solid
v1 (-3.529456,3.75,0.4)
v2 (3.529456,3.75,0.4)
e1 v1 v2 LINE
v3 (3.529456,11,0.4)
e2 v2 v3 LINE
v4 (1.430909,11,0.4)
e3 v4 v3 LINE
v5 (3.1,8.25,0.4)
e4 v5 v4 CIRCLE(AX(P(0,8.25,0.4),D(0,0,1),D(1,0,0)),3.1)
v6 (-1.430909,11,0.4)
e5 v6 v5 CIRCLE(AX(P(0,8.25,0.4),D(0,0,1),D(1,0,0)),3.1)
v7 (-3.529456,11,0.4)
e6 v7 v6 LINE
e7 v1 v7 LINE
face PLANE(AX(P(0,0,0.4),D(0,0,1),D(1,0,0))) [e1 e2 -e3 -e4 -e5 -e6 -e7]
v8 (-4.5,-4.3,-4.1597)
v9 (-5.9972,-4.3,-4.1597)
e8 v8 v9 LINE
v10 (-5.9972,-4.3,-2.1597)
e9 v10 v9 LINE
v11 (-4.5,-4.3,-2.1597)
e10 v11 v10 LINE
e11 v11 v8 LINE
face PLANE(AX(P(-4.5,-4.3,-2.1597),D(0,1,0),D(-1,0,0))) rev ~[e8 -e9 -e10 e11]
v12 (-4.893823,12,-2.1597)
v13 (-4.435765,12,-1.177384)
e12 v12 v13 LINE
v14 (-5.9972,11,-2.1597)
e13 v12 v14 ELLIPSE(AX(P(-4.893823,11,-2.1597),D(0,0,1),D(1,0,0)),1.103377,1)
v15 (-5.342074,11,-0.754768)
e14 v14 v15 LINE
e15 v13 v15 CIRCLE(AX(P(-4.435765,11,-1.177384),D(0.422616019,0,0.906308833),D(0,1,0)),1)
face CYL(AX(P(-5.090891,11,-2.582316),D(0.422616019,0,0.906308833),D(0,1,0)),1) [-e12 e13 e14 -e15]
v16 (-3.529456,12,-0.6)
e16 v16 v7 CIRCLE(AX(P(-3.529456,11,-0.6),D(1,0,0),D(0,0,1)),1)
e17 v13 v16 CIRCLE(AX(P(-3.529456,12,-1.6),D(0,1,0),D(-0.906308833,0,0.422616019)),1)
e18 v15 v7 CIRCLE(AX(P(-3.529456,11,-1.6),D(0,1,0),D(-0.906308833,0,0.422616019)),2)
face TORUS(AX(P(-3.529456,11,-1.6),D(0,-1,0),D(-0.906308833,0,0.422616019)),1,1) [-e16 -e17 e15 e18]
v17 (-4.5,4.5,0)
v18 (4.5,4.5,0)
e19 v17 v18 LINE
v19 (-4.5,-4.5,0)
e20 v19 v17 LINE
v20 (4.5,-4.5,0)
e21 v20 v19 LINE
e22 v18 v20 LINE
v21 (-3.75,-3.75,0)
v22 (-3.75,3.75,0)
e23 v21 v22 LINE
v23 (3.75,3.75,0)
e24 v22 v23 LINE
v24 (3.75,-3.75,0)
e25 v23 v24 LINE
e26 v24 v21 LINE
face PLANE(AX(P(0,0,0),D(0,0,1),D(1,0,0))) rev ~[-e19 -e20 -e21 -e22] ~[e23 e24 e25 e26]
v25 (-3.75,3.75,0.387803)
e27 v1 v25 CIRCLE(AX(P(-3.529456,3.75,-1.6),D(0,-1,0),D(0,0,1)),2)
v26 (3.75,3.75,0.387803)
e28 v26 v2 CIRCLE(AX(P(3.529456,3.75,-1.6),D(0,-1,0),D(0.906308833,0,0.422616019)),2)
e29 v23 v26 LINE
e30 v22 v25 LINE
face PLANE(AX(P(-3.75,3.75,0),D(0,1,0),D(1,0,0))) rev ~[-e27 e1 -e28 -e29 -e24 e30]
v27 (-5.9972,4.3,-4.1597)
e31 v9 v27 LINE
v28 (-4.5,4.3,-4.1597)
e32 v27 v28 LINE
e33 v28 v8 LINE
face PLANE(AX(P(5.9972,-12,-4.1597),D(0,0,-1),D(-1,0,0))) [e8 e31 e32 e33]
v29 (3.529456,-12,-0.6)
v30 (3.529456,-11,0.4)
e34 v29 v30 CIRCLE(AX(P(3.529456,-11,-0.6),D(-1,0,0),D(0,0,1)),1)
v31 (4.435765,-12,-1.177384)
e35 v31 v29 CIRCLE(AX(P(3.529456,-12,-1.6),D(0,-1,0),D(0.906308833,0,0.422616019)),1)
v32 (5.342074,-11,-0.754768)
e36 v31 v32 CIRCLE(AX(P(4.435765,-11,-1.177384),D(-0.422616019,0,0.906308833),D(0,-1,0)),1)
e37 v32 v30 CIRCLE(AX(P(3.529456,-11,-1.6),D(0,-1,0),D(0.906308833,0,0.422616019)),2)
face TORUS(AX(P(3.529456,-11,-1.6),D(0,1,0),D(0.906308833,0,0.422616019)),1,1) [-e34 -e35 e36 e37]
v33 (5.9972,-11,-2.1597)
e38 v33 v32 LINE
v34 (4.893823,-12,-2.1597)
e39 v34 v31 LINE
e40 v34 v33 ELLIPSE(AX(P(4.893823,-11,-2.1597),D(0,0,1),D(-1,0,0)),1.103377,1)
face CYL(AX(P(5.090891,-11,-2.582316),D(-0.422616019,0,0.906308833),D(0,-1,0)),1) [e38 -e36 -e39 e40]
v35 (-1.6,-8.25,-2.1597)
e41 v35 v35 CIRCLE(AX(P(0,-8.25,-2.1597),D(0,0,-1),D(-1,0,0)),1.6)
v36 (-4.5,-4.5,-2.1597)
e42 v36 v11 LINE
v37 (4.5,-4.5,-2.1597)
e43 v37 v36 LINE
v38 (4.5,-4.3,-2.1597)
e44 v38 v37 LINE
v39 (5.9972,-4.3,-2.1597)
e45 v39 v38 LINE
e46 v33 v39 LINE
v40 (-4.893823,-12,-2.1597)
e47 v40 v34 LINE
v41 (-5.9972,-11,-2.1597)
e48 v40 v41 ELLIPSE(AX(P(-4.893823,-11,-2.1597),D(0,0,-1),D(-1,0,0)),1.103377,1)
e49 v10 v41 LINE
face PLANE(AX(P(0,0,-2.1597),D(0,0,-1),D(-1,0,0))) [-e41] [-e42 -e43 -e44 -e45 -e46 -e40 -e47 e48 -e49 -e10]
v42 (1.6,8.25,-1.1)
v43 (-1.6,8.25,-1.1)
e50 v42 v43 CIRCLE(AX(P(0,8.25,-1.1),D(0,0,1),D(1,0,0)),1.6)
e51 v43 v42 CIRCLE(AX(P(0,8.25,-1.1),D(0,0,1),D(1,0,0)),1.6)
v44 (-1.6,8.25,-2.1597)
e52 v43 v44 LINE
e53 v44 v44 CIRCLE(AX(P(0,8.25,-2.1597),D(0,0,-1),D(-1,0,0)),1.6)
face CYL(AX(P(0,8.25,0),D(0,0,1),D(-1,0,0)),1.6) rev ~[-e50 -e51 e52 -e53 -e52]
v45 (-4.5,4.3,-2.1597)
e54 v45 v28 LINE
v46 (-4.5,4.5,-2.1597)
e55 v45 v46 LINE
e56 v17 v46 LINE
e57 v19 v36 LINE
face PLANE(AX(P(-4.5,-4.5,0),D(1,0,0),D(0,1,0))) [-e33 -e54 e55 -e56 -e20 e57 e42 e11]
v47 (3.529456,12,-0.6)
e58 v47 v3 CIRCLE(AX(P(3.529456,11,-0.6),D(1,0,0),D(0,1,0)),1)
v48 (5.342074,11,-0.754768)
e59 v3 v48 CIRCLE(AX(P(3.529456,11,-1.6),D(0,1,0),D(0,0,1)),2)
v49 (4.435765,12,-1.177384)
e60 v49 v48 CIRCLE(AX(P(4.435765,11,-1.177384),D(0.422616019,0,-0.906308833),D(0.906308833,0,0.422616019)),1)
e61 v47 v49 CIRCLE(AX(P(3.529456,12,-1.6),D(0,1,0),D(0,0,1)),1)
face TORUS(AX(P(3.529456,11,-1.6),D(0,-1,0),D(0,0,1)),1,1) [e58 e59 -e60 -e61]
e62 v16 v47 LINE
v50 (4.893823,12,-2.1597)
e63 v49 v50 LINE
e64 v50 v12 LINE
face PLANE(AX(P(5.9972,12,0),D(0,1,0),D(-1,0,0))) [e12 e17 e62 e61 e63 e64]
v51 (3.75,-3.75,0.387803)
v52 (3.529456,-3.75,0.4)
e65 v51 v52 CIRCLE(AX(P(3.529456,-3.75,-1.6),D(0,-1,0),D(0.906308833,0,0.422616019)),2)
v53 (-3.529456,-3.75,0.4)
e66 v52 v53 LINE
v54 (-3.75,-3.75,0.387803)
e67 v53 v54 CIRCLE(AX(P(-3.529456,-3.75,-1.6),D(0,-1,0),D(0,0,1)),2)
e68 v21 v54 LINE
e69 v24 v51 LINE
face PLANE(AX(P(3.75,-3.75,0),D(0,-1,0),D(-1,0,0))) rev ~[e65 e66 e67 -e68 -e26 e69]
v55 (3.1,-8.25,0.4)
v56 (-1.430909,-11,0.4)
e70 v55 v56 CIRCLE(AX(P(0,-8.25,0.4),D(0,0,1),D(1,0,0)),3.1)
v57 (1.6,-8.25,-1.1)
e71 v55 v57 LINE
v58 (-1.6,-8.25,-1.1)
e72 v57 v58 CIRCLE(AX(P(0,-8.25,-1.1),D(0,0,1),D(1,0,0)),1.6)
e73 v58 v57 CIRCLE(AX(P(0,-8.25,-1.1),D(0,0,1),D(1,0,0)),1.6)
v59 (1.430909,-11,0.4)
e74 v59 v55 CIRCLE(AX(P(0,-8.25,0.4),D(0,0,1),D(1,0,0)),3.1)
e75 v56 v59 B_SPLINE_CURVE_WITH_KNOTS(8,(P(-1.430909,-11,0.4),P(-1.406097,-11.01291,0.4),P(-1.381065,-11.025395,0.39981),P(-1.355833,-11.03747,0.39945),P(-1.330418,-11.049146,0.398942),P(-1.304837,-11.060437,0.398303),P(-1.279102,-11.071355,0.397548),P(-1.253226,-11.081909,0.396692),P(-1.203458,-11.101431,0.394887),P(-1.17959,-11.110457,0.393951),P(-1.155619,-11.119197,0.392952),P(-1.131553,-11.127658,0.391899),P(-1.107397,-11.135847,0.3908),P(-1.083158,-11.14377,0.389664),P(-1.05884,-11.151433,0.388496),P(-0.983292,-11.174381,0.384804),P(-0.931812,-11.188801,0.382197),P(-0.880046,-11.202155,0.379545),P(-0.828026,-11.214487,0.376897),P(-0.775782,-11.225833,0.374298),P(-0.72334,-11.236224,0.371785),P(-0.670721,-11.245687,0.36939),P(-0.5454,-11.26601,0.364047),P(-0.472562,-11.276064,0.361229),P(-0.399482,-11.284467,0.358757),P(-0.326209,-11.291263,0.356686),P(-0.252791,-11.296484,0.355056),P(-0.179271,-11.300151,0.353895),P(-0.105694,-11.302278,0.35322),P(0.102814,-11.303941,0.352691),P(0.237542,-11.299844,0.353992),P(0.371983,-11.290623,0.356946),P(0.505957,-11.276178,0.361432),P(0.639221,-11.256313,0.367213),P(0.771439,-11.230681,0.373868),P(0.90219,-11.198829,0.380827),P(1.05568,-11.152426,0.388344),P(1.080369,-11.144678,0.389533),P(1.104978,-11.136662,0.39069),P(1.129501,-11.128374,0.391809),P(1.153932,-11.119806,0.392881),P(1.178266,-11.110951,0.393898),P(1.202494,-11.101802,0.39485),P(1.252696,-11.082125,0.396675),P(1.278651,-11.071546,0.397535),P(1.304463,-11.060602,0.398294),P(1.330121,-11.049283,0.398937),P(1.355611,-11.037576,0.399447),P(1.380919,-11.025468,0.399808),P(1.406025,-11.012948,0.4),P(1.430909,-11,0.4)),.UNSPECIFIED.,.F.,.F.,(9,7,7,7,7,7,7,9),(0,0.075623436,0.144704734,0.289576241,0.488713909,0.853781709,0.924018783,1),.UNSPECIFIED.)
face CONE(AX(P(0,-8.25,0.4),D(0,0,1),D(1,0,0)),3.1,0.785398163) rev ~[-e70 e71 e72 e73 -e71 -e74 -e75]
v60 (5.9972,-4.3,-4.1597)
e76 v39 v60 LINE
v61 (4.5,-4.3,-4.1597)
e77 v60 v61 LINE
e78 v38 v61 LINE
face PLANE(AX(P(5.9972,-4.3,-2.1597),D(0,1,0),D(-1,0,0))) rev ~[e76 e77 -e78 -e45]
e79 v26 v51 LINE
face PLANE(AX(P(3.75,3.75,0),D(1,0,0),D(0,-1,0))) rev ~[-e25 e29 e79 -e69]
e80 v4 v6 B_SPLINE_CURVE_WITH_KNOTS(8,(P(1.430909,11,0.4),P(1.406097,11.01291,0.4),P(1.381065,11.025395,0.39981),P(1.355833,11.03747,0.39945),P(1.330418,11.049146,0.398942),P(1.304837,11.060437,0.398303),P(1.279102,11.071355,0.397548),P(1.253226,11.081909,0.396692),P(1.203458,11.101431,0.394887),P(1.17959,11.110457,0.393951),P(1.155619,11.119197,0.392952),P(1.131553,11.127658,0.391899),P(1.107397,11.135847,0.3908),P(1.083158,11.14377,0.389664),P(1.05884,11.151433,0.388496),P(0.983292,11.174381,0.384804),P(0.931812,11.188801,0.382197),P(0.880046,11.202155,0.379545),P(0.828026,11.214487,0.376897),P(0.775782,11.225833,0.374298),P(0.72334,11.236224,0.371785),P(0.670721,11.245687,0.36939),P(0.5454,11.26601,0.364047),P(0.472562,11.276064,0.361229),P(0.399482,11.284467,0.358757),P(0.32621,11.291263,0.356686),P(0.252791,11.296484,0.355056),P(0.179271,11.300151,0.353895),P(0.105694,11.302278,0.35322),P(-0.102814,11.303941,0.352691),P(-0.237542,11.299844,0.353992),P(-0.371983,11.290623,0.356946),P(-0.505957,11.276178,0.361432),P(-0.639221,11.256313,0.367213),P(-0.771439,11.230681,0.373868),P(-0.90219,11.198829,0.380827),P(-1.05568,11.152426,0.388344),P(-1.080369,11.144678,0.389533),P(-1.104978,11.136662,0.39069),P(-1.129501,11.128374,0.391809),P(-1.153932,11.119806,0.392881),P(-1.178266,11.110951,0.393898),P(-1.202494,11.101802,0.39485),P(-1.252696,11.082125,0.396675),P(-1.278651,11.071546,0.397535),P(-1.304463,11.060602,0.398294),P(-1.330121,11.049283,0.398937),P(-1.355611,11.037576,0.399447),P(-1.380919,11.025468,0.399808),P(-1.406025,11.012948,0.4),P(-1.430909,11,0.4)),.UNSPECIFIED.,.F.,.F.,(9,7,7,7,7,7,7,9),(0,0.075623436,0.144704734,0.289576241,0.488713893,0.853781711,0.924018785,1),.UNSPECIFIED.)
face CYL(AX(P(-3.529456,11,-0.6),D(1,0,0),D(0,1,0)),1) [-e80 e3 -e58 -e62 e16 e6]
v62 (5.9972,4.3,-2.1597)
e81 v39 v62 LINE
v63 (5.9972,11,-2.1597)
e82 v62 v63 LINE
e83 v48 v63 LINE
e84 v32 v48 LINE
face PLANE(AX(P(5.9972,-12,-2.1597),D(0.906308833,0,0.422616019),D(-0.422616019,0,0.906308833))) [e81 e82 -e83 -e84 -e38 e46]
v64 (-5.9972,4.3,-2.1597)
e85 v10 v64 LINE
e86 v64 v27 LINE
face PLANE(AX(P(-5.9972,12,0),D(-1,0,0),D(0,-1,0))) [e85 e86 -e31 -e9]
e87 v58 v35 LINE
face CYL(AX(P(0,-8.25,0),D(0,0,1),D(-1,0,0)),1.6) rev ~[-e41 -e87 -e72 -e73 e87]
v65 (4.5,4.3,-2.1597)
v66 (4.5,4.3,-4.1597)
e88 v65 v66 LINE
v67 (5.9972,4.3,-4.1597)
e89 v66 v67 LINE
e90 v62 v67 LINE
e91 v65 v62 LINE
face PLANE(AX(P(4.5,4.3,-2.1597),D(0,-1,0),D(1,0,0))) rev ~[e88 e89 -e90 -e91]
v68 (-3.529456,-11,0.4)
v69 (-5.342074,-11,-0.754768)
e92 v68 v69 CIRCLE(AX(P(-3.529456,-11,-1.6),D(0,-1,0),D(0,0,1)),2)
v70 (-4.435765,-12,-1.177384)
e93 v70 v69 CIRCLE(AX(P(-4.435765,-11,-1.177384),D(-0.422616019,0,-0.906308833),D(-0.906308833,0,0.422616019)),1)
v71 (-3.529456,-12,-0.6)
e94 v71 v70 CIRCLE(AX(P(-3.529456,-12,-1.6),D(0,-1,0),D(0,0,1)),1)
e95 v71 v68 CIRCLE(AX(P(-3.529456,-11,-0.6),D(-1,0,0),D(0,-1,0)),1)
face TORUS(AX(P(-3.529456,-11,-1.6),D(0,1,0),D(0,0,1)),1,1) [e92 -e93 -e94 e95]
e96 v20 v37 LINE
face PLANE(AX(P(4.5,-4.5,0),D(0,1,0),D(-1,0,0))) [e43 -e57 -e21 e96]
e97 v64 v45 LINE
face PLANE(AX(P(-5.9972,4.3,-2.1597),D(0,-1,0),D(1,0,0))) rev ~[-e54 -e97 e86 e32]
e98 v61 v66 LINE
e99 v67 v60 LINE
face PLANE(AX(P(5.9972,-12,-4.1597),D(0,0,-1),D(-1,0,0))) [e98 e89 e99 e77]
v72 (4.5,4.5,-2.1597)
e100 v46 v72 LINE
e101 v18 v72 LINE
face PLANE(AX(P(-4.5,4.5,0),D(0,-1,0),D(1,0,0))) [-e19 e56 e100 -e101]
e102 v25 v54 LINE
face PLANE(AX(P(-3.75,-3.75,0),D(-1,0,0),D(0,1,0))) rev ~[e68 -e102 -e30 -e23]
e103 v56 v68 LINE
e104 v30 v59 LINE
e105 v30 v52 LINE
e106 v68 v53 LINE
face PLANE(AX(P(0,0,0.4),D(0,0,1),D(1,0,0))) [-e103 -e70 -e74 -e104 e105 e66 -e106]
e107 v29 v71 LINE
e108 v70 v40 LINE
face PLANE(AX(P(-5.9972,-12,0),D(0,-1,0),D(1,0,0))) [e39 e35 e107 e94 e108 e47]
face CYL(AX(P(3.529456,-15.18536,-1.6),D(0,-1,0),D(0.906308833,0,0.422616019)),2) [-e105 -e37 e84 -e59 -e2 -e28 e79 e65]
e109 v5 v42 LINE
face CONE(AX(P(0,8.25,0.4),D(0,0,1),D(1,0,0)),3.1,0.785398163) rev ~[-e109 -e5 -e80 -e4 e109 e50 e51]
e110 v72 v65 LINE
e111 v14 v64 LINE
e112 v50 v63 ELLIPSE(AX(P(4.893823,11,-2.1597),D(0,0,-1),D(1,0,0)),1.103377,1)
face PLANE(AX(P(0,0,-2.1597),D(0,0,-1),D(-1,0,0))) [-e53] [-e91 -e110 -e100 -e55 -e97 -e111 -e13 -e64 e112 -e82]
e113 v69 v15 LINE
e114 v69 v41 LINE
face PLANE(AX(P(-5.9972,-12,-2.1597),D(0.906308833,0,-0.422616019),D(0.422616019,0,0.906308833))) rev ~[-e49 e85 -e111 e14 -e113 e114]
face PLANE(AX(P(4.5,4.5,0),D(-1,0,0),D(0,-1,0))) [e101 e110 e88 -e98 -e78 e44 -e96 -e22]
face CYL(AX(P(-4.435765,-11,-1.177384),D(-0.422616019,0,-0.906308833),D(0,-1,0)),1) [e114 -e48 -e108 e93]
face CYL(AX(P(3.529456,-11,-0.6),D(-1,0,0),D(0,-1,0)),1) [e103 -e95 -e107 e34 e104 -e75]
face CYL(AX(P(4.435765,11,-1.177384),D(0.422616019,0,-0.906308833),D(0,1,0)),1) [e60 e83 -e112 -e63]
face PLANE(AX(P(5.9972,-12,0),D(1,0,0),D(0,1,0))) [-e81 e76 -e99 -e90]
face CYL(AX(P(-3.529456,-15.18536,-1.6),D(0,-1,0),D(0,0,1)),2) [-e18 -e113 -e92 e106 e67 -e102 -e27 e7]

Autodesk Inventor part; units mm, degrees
ref_plane "YZ Plane" through (0, 0, 0) normal (1, 0, 0) x (0, 1, 0)
ref_plane "XZ Plane" through (0, 0, 0) normal (0, 1, 0) x (-1, 0, 0)
sketch "Эскиз1" plane through (0, 0, 0) normal (0, 0, 1) x (1, 0, 0)
  line L0 (-4.25, 4.25) -> (4.25, 4.25) projected
  line L1 (4.25, 4.25) -> (4.25, -4.25) projected
  line L2 (4.25, -4.25) -> (-4.25, -4.25) projected
  line L3 (-4.25, -4.25) -> (-4.25, 4.25) projected
  line L4 (7, -7) -> (7, 7) projected
  line L5 (-7, 7) -> (-7, 4.25) projected
  line L6 (-7, 4.25) -> (-11, 4.25) projected
  line L7 (-11, 4.25) -> (-11, -4.25) projected
  line L8 (-11, -4.25) -> (-7, -4.25) projected
  line L9 (-7, -4.25) -> (-7, -7) projected
  line L10 (-3.75, 3.75) -> (3.75, 3.75)
  line L11 (3.75, 3.75) -> (3.75, -3.75)
  line L12 (3.75, -3.75) -> (-3.75, -3.75)
  line L13 (-3.75, -3.75) -> (-3.75, 3.75)
  line L14 (5.9972, -12) -> (5.9972, -7.2) projected
  line L15 (-5.9972, -7.2) -> (-5.9972, -12) projected
  line L16 (5.9972, -12) -> (-5.9972, -12) projected
  line L17 (5.9972, 7.2) -> (5.9972, 12) projected
  line L18 (-5.9972, 12) -> (5.9972, 12) projected
  line L19 (-5.9972, 12) -> (-5.9972, 7.2) projected
  line L20 (-5.9972, -12) -> (5.9972, -12)
  line L21 (5.9972, -12) -> (5.9972, 12)
  line L22 (5.9972, 12) -> (-5.9972, 12)
  line L23 (-5.9972, 12) -> (-5.9972, -12)
  circle A0 centre (0, -8.25) radius 1.6 projected
  circle A1 centre (0, 8.25) radius 1.6 projected
  point P0 (0, 0)
  dimension "d0" = 0.5
extrude "Выдавливание1" add sketch "Эскиз1" along normal blind 0.4 contours L0 L1 L2 L3 | L16 L15 L23 L19 L18 L17 L21 L14
sketch "Эскиз3" plane through (0, 0, 0) normal (0, 0, -1) x (-1, 0, 0)
  line L0 (-5.9972, 12) -> (5.9972, 12) projected
  line L1 (-5.9972, -12) -> (-5.9972, 12) projected
  line L2 (5.9972, -12) -> (-5.9972, -12) projected
  line L3 (5.9972, 12) -> (5.9972, -12) projected
  line L4 (3.75, 3.75) -> (-3.75, 3.75) projected
  line L5 (3.75, -3.75) -> (3.75, 3.75) projected
  line L6 (-3.75, -3.75) -> (3.75, -3.75) projected
  line L7 (-3.75, 3.75) -> (-3.75, -3.75) projected
  line L8 (-4.25, 4.25) -> (4.25, 4.25)
  line L9 (4.25, 4.25) -> (4.25, -4.25)
  line L10 (4.25, -4.25) -> (-4.25, -4.25)
  line L11 (-4.25, -4.25) -> (-4.25, 4.25)
  line L12 (4.5, 4.5) -> (-4.5, 4.5)
  line L13 (-4.5, 4.5) -> (-4.5, -4.5)
  line L14 (-4.5, -4.5) -> (4.5, -4.5)
  line L15 (4.5, -4.5) -> (4.5, 4.5)
  circle A0 centre (0, -8.25) radius 1.6 projected
  circle A1 centre (0, 8.25) radius 1.6 projected
  point P0 (0, 0)
  dimension "d6" = 0.5
  dimension "d7" = 0.25
ref_plane "РабПлоскость2" through (-5.9972, 7.2, -2.1597) normal (0, 0, 1) x (1, 0, 0)
extrude "Выдавливание3" add sketch "Эскиз3" along normal up to surface (2.1597 mm away) contours L0 L3 L2 L1
sketch "Эскиз5" plane through (5.9972, -12, -2.1597) normal (0, 0, -1) x (-1, 0, 0)
  line L0 (-1.6742, 4.8) -> (-1.6742, 19.2) projected
  line L1 (-1.6742, 19.2) -> (13.6686, 19.2) projected
  line L2 (13.6686, 19.2) -> (13.6686, 4.8) projected
  line L3 (13.6686, 4.8) -> (-1.6742, 4.8) projected
  line L4 (13.4686, 19) -> (-1.4742, 19)
  line L5 (-1.4742, 19) -> (-1.4742, 5)
  line L6 (-1.4742, 5) -> (13.4686, 5)
  line L7 (13.4686, 5) -> (13.4686, 19)
  line L8 (1.4972, 16.5) -> (10.4972, 16.5) projected
  line L9 (10.4972, 16.5) -> (10.4972, 7.5) projected
  line L10 (10.4972, 7.5) -> (1.4972, 7.5) projected
  line L11 (1.4972, 7.5) -> (1.4972, 16.5) projected
  line L12 (0, 24) -> (0, 0) projected
  line L13 (0, 0) -> (11.9944, 0) projected
  line L14 (11.9944, 0) -> (11.9944, 24) projected
  line L15 (11.9944, 24) -> (0, 24) projected
  line L16 (0, 7.5) -> (11.9944, 7.5) projected
  line L17 (11.9944, 16.5) -> (0, 16.5) projected
  line L18 (0, 7.7) -> (11.9944, 7.7)
  line L19 (11.9944, 16.3) -> (0, 16.3)
  point P0 (5.9972, 12)
  point P1 (11.9944, 5)
  point P2 (11.9944, 19)
  point P3 (0, 19)
  point P4 (0, 5)
  point P5 (10.4972, 16.3)
  point P6 (10.4972, 7.7)
  point P7 (11.9944, 7.7)
  point P8 (1.4972, 16.3)
  point P9 (0, 16.3)
  point P10 (0, 7.7)
  point P11 (1.4972, 7.7)
  dimension "d13" = 0.2
  dimension "d20" = 0.2
  dimension "d21" = 0.2
extrude "Выдавливание5" add sketch "Эскиз5" along normal blind 2 contours L12 L19 L11 L18 | L18 L9 L19 L14
sketch "Эскиз6" plane through (-5.9972, -12, 0.4) normal (0, -1, 0) x (1, 0, 0)
  line L0 (13.5091, -5.808) -> (11.9944, -2.5597) projected
  line L1 (11.9944, -2.5597) -> (0, -2.5597) projected
  line L2 (0, -2.5597) -> (-1.5147, -5.808) projected
  arc A0 (-1.5147, -5.808) -> (13.5091, -5.808) centre (5.9972, 3.55) ccw projected
  line L3 (0, -2.5597) -> (11.9944, -2.5597) projected
  line L4 (0, -2.5597) -> (1.1936, 0)
  line L5 (0, 0) -> (11.9944, 0) projected
  line L6 (11.9944, -2.5597) -> (11.9944, 0) projected
  line L7 (11.9944, -2.5597) -> (10.8008, 0)
  line L8 (13.4686, -2.5597) -> (11.9944, -2.5597) projected
  line L9 (6.996, -2.5597) -> (11.9944, -2.5597) projected
  line L10 (0, -2.5597) -> (-1.4742, -2.5597) projected
  line L11 (-1.4742, -2.5597) -> (-1.4742, -4.5597) projected
  line L12 (13.4686, -4.5597) -> (-1.4742, -4.5597) projected
  line L13 (13.4686, -2.5597) -> (13.4686, -4.5597) projected
  line L14 (11.9944, -2.5597) -> (11.9944, 0) projected
  line L15 (0, 0) -> (11.9944, 0) projected
  line L16 (0, -2.5597) -> (0, 0) projected
  line L17 (11.9944, -2.5597) -> (0, -2.5597) projected
  line L18 (6.996, -2.5597) -> (4.9985, -2.5597) projected
  line L19 (0, -2.5597) -> (4.9985, -2.5597) projected
  point P0 (5.9972, -0.4)
  point P1 (11.9944, -2.5597)
  point P2 (11.9944, -2.5597)
  point P3 (12.927, -4.5597)
  point P4 (-0.9326, -4.5597)
  point P5 (0, -2.5597)
  point P6 (0, -2.5597)
  point P7 (0, -2.5597)
  point P8 (0, -2.5597)
extrude "Выдавливание6" cut sketch "Эскиз6" against normal up to surface (24 mm away) contours L0 L8 L13 L12 | L7 L5 L6 | L12 L11 L10 L2 | L16 L5 L4
fillet "Сопряжение2" radius 2 2 edges at (-4.8036, 0, 0.4) (4.8036, 0, 0.4)
fillet "Сопряжение3" radius 1 10 edges at (0, -12, 0.4) (4.6041, -12, 0.0868) (5.6696, -12, -1.4572) (-5.6696, -12, -1.4572) (-4.6041, -12, 0.0868) (-5.6696, 12, -1.4572) (0, 12, 0.4) (4.6041, 12, 0.0868) (5.6696, 12, -1.4572) (-4.6041, 12, 0.0868)
chamfer "Фаска1" distance 1.5 angle 45 2 edges at (-1.6, -8.25, 0.4) (-1.6, 8.25, 0.4)
properties part number "camera_cup"
